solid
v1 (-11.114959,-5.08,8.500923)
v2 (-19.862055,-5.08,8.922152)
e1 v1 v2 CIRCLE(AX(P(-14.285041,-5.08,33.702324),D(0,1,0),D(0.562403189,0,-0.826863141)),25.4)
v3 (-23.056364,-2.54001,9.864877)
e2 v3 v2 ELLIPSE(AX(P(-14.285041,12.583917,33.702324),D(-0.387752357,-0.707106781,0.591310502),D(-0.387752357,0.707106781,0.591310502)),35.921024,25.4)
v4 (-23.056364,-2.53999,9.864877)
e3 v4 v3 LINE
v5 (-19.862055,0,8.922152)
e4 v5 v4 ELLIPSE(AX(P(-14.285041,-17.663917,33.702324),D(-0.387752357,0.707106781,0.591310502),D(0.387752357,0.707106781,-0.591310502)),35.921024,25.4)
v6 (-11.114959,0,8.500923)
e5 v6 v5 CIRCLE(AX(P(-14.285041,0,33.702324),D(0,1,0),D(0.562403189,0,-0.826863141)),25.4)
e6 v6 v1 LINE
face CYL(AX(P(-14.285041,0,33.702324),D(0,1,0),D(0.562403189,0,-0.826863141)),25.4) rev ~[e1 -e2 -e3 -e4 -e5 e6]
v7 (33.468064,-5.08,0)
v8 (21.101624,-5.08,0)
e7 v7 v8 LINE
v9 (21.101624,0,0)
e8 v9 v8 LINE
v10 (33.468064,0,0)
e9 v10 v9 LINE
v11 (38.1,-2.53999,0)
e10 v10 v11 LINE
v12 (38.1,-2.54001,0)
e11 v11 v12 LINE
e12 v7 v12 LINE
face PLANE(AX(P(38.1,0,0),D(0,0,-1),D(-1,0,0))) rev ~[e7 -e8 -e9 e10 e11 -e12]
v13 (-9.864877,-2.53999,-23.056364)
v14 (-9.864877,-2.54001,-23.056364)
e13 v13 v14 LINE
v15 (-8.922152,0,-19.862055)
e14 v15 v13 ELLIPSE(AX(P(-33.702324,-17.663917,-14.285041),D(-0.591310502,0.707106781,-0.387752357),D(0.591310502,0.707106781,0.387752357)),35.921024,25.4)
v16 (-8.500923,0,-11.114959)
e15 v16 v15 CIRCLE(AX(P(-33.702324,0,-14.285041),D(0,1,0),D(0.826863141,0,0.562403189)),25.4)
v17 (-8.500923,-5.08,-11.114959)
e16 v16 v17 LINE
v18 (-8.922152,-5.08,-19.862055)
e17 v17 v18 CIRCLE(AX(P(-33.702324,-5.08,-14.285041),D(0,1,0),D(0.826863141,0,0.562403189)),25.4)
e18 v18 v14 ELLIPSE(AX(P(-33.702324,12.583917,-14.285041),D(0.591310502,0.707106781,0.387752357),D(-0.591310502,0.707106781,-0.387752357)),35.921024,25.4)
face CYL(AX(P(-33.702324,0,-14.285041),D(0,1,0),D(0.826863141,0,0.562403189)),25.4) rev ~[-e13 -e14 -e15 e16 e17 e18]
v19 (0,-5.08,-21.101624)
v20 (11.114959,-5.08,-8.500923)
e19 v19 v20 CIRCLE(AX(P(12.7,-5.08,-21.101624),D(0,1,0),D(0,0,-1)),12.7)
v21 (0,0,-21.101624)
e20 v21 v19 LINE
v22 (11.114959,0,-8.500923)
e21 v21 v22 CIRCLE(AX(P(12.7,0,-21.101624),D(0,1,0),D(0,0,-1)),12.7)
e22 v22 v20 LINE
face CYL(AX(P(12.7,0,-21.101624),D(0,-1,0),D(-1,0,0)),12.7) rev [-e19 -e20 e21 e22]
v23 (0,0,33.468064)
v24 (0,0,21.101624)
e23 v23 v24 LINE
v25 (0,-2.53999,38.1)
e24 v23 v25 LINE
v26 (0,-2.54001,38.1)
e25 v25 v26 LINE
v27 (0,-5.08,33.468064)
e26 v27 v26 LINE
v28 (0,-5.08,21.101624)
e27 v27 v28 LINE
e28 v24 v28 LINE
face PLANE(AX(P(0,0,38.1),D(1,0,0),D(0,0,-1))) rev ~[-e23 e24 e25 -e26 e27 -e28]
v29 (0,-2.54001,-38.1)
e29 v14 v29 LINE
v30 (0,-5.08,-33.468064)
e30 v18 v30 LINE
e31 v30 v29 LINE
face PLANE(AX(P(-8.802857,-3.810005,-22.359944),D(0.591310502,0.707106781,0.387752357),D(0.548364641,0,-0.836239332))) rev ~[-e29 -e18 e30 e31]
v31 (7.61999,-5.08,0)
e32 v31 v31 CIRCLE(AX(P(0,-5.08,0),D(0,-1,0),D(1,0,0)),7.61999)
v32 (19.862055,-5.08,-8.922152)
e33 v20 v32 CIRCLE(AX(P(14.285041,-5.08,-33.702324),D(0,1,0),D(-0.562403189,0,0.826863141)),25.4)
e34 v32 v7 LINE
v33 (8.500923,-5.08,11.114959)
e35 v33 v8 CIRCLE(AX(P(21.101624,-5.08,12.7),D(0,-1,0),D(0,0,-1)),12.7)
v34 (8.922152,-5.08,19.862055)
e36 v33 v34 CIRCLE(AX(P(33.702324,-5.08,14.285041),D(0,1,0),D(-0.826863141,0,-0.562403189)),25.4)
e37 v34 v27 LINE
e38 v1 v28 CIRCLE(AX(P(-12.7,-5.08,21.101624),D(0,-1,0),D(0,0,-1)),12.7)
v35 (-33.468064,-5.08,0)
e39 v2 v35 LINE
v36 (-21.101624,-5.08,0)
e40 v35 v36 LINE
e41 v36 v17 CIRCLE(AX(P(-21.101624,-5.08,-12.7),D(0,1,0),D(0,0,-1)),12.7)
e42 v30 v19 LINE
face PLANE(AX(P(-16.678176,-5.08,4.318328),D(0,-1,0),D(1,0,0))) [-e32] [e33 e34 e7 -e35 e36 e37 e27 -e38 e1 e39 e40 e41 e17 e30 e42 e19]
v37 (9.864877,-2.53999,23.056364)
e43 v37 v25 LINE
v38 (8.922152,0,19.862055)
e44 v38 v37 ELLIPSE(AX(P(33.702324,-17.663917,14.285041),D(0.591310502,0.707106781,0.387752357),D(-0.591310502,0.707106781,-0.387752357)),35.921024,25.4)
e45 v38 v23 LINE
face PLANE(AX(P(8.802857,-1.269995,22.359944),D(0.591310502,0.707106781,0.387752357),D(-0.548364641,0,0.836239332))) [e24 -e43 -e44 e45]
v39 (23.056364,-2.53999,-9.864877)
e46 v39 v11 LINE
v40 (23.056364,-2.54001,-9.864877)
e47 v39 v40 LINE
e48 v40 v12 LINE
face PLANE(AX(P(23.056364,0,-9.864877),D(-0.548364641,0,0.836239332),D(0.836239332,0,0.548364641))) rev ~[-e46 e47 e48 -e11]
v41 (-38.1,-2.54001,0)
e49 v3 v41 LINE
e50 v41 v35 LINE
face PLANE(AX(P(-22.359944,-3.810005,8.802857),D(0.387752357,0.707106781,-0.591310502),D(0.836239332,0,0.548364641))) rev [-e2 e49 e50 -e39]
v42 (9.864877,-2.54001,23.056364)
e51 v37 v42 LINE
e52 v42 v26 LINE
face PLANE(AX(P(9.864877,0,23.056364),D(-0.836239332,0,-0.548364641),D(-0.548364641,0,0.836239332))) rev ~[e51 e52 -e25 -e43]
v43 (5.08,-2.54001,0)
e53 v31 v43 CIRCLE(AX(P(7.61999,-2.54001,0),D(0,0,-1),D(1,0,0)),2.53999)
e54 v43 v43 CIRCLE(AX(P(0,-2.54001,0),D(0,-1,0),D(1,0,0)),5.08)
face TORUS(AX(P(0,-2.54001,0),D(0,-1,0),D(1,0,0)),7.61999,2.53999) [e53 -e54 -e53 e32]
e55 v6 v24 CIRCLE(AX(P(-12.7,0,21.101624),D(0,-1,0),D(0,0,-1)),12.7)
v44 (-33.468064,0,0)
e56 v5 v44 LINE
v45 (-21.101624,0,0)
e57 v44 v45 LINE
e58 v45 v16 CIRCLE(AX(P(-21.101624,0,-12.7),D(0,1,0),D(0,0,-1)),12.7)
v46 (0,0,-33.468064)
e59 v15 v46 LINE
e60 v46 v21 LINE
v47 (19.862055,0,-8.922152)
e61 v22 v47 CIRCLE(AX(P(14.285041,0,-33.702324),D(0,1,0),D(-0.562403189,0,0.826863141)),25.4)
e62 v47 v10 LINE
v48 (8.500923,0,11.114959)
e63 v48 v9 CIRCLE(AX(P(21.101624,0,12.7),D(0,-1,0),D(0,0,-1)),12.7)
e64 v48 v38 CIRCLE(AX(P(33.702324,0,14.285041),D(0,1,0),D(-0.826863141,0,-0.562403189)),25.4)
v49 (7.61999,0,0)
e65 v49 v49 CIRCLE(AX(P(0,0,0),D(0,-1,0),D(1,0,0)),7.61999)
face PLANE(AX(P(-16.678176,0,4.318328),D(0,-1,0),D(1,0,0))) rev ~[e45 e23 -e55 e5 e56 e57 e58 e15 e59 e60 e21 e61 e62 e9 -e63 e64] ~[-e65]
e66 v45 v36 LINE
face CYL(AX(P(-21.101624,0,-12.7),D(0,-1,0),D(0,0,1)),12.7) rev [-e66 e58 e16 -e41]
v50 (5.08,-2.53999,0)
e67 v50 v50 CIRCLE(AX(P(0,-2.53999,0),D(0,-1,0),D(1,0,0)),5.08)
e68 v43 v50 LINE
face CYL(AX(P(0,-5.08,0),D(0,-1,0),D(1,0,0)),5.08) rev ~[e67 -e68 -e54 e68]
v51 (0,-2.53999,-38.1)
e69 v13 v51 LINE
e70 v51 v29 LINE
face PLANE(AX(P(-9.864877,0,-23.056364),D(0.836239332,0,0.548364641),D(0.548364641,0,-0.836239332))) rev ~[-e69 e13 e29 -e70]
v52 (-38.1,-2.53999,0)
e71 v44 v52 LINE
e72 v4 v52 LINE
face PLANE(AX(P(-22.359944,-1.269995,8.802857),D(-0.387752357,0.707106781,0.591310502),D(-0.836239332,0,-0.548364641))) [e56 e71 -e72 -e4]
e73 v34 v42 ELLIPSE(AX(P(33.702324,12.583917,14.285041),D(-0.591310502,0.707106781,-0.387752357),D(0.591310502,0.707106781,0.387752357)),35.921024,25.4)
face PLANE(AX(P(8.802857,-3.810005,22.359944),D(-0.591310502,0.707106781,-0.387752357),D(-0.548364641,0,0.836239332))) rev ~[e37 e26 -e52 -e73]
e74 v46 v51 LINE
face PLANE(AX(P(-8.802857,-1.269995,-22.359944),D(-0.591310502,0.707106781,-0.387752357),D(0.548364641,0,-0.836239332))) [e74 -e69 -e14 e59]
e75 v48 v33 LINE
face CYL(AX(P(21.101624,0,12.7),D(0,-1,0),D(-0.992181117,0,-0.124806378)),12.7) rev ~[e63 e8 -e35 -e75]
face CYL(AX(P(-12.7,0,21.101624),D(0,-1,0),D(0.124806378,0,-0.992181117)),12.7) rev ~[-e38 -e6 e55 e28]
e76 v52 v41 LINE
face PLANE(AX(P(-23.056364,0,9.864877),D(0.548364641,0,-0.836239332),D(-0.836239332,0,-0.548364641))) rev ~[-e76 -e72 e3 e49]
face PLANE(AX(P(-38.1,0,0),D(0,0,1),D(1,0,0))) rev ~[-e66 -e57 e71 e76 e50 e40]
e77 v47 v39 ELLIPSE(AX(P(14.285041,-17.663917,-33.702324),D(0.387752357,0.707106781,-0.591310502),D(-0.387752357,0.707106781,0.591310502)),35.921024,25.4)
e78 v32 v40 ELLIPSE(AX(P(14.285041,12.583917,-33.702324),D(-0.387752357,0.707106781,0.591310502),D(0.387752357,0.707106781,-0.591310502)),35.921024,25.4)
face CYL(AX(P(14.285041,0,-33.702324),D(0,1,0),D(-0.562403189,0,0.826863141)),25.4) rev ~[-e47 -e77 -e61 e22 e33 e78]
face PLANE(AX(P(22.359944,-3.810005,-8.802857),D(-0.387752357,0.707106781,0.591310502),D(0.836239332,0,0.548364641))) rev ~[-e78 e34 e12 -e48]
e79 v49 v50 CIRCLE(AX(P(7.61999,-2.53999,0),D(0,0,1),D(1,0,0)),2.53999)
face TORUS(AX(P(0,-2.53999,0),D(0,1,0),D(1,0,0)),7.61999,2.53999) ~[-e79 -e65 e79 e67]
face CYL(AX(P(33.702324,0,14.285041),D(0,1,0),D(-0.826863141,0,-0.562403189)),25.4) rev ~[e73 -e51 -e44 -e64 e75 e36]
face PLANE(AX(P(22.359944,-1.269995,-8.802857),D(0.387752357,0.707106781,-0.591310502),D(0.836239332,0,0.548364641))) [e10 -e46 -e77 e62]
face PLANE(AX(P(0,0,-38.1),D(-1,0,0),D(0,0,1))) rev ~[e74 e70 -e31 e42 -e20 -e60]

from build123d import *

# Parameters (mm, degrees)
F1_DEPTH = 5.08
F2_R     = 5.08
F3_DEPTH = 25.4
F4_R     = 12.7
F5_SIZE  = 2.53999
F6_R     = 2.53999


# Not quite as in the source:
# - a fillet or chamfer is up to 0.001 mm smaller than in the source, because OpenCascade refuses the exact size


with BuildPart() as f1:
    # F0 (on Front) → F1 (new body)
    with BuildSketch(Plane.XZ):
        with BuildLine():
            Line((-12.7, 0), (0, 0))
            Line((0, 0), (0, 12.7))
            ThreePointArc((0, 12.7), (-11.1850810666, 8.4922018267), (-23.0563643922, 9.8648766371))
            Line((-23.0563643922, 9.8648766371), (-38.1, 0))
            Line((-38.1, 0), (-12.7, 0))
        make_face()
        with BuildLine():
            Line((0, 12.7), (0, 0))
            Line((0, 0), (12.7, 0))
            ThreePointArc((12.7, 0), (8.4922018267, 11.1850810666), (9.8648766371, 23.0563643922))
            Line((9.8648766371, 23.0563643922), (0, 38.1))
            Line((0, 38.1), (0, 12.7))
        make_face()
        with BuildLine():
            Line((0, -12.7), (0, 0))
            Line((0, 0), (-12.7, 0))
            ThreePointArc((-12.7, 0), (-8.4922018267, -11.1850810666), (-9.8648766371, -23.0563643922))
            Line((-9.8648766371, -23.0563643922), (0, -38.1))
            Line((0, -38.1), (0, -12.7))
        make_face()
        with BuildLine():
            Line((12.7, 0), (0, 0))
            Line((0, 0), (0, -12.7))
            ThreePointArc((0, -12.7), (11.1850810666, -8.4922018267), (23.0563643922, -9.8648766371))
            Line((23.0563643922, -9.8648766371), (38.1, 0))
            Line((38.1, 0), (12.7, 0))
        make_face()
    extrude(amount=F1_DEPTH)

    # F2 (on face) → F3 (cut)
    with BuildSketch(Plane.XZ.offset(5.08)):
        Circle(F2_R)
    extrude(amount=-F3_DEPTH, mode=Mode.SUBTRACT)

    # F4
    f4_edges = [f1.edges().sort_by_distance(p)[0] for p in [
        (0, -2.54, 12.7),
        (12.7, -2.54, 0),
        (0, -2.54, -12.7),
        (-12.7, -2.54, 0),
    ]]
    fillet(f4_edges, radius=F4_R)

    # F5 (size 2.54 in the source; OpenCascade refuses exactly that, so slightly less here)
    f5_edges = [f1.edges().sort_by_distance(p)[0] for p in [
        (30.578182, 0, -4.932438),
        (30.578182, -5.08, -4.932438),
        (4.932438, 0, 30.578182),
        (4.932438, -5.08, 30.578182),
        (-4.932438, 0, -30.578182),
        (-4.932438, -5.08, -30.578182),
        (-30.578182, 0, 4.932438),
        (-30.578182, -5.08, 4.932438),
    ]]
    chamfer(f5_edges, length=F5_SIZE)

    # F6 (radius 2.54 in the source; OpenCascade refuses exactly that, so slightly less here)
    f6_edges = [f1.edges().sort_by_distance(p)[0] for p in [
        (-5.08, 0, 0),
        (-5.08, -5.08, 0),
    ]]
    fillet(f6_edges, radius=F6_R)


solid = f1.part
